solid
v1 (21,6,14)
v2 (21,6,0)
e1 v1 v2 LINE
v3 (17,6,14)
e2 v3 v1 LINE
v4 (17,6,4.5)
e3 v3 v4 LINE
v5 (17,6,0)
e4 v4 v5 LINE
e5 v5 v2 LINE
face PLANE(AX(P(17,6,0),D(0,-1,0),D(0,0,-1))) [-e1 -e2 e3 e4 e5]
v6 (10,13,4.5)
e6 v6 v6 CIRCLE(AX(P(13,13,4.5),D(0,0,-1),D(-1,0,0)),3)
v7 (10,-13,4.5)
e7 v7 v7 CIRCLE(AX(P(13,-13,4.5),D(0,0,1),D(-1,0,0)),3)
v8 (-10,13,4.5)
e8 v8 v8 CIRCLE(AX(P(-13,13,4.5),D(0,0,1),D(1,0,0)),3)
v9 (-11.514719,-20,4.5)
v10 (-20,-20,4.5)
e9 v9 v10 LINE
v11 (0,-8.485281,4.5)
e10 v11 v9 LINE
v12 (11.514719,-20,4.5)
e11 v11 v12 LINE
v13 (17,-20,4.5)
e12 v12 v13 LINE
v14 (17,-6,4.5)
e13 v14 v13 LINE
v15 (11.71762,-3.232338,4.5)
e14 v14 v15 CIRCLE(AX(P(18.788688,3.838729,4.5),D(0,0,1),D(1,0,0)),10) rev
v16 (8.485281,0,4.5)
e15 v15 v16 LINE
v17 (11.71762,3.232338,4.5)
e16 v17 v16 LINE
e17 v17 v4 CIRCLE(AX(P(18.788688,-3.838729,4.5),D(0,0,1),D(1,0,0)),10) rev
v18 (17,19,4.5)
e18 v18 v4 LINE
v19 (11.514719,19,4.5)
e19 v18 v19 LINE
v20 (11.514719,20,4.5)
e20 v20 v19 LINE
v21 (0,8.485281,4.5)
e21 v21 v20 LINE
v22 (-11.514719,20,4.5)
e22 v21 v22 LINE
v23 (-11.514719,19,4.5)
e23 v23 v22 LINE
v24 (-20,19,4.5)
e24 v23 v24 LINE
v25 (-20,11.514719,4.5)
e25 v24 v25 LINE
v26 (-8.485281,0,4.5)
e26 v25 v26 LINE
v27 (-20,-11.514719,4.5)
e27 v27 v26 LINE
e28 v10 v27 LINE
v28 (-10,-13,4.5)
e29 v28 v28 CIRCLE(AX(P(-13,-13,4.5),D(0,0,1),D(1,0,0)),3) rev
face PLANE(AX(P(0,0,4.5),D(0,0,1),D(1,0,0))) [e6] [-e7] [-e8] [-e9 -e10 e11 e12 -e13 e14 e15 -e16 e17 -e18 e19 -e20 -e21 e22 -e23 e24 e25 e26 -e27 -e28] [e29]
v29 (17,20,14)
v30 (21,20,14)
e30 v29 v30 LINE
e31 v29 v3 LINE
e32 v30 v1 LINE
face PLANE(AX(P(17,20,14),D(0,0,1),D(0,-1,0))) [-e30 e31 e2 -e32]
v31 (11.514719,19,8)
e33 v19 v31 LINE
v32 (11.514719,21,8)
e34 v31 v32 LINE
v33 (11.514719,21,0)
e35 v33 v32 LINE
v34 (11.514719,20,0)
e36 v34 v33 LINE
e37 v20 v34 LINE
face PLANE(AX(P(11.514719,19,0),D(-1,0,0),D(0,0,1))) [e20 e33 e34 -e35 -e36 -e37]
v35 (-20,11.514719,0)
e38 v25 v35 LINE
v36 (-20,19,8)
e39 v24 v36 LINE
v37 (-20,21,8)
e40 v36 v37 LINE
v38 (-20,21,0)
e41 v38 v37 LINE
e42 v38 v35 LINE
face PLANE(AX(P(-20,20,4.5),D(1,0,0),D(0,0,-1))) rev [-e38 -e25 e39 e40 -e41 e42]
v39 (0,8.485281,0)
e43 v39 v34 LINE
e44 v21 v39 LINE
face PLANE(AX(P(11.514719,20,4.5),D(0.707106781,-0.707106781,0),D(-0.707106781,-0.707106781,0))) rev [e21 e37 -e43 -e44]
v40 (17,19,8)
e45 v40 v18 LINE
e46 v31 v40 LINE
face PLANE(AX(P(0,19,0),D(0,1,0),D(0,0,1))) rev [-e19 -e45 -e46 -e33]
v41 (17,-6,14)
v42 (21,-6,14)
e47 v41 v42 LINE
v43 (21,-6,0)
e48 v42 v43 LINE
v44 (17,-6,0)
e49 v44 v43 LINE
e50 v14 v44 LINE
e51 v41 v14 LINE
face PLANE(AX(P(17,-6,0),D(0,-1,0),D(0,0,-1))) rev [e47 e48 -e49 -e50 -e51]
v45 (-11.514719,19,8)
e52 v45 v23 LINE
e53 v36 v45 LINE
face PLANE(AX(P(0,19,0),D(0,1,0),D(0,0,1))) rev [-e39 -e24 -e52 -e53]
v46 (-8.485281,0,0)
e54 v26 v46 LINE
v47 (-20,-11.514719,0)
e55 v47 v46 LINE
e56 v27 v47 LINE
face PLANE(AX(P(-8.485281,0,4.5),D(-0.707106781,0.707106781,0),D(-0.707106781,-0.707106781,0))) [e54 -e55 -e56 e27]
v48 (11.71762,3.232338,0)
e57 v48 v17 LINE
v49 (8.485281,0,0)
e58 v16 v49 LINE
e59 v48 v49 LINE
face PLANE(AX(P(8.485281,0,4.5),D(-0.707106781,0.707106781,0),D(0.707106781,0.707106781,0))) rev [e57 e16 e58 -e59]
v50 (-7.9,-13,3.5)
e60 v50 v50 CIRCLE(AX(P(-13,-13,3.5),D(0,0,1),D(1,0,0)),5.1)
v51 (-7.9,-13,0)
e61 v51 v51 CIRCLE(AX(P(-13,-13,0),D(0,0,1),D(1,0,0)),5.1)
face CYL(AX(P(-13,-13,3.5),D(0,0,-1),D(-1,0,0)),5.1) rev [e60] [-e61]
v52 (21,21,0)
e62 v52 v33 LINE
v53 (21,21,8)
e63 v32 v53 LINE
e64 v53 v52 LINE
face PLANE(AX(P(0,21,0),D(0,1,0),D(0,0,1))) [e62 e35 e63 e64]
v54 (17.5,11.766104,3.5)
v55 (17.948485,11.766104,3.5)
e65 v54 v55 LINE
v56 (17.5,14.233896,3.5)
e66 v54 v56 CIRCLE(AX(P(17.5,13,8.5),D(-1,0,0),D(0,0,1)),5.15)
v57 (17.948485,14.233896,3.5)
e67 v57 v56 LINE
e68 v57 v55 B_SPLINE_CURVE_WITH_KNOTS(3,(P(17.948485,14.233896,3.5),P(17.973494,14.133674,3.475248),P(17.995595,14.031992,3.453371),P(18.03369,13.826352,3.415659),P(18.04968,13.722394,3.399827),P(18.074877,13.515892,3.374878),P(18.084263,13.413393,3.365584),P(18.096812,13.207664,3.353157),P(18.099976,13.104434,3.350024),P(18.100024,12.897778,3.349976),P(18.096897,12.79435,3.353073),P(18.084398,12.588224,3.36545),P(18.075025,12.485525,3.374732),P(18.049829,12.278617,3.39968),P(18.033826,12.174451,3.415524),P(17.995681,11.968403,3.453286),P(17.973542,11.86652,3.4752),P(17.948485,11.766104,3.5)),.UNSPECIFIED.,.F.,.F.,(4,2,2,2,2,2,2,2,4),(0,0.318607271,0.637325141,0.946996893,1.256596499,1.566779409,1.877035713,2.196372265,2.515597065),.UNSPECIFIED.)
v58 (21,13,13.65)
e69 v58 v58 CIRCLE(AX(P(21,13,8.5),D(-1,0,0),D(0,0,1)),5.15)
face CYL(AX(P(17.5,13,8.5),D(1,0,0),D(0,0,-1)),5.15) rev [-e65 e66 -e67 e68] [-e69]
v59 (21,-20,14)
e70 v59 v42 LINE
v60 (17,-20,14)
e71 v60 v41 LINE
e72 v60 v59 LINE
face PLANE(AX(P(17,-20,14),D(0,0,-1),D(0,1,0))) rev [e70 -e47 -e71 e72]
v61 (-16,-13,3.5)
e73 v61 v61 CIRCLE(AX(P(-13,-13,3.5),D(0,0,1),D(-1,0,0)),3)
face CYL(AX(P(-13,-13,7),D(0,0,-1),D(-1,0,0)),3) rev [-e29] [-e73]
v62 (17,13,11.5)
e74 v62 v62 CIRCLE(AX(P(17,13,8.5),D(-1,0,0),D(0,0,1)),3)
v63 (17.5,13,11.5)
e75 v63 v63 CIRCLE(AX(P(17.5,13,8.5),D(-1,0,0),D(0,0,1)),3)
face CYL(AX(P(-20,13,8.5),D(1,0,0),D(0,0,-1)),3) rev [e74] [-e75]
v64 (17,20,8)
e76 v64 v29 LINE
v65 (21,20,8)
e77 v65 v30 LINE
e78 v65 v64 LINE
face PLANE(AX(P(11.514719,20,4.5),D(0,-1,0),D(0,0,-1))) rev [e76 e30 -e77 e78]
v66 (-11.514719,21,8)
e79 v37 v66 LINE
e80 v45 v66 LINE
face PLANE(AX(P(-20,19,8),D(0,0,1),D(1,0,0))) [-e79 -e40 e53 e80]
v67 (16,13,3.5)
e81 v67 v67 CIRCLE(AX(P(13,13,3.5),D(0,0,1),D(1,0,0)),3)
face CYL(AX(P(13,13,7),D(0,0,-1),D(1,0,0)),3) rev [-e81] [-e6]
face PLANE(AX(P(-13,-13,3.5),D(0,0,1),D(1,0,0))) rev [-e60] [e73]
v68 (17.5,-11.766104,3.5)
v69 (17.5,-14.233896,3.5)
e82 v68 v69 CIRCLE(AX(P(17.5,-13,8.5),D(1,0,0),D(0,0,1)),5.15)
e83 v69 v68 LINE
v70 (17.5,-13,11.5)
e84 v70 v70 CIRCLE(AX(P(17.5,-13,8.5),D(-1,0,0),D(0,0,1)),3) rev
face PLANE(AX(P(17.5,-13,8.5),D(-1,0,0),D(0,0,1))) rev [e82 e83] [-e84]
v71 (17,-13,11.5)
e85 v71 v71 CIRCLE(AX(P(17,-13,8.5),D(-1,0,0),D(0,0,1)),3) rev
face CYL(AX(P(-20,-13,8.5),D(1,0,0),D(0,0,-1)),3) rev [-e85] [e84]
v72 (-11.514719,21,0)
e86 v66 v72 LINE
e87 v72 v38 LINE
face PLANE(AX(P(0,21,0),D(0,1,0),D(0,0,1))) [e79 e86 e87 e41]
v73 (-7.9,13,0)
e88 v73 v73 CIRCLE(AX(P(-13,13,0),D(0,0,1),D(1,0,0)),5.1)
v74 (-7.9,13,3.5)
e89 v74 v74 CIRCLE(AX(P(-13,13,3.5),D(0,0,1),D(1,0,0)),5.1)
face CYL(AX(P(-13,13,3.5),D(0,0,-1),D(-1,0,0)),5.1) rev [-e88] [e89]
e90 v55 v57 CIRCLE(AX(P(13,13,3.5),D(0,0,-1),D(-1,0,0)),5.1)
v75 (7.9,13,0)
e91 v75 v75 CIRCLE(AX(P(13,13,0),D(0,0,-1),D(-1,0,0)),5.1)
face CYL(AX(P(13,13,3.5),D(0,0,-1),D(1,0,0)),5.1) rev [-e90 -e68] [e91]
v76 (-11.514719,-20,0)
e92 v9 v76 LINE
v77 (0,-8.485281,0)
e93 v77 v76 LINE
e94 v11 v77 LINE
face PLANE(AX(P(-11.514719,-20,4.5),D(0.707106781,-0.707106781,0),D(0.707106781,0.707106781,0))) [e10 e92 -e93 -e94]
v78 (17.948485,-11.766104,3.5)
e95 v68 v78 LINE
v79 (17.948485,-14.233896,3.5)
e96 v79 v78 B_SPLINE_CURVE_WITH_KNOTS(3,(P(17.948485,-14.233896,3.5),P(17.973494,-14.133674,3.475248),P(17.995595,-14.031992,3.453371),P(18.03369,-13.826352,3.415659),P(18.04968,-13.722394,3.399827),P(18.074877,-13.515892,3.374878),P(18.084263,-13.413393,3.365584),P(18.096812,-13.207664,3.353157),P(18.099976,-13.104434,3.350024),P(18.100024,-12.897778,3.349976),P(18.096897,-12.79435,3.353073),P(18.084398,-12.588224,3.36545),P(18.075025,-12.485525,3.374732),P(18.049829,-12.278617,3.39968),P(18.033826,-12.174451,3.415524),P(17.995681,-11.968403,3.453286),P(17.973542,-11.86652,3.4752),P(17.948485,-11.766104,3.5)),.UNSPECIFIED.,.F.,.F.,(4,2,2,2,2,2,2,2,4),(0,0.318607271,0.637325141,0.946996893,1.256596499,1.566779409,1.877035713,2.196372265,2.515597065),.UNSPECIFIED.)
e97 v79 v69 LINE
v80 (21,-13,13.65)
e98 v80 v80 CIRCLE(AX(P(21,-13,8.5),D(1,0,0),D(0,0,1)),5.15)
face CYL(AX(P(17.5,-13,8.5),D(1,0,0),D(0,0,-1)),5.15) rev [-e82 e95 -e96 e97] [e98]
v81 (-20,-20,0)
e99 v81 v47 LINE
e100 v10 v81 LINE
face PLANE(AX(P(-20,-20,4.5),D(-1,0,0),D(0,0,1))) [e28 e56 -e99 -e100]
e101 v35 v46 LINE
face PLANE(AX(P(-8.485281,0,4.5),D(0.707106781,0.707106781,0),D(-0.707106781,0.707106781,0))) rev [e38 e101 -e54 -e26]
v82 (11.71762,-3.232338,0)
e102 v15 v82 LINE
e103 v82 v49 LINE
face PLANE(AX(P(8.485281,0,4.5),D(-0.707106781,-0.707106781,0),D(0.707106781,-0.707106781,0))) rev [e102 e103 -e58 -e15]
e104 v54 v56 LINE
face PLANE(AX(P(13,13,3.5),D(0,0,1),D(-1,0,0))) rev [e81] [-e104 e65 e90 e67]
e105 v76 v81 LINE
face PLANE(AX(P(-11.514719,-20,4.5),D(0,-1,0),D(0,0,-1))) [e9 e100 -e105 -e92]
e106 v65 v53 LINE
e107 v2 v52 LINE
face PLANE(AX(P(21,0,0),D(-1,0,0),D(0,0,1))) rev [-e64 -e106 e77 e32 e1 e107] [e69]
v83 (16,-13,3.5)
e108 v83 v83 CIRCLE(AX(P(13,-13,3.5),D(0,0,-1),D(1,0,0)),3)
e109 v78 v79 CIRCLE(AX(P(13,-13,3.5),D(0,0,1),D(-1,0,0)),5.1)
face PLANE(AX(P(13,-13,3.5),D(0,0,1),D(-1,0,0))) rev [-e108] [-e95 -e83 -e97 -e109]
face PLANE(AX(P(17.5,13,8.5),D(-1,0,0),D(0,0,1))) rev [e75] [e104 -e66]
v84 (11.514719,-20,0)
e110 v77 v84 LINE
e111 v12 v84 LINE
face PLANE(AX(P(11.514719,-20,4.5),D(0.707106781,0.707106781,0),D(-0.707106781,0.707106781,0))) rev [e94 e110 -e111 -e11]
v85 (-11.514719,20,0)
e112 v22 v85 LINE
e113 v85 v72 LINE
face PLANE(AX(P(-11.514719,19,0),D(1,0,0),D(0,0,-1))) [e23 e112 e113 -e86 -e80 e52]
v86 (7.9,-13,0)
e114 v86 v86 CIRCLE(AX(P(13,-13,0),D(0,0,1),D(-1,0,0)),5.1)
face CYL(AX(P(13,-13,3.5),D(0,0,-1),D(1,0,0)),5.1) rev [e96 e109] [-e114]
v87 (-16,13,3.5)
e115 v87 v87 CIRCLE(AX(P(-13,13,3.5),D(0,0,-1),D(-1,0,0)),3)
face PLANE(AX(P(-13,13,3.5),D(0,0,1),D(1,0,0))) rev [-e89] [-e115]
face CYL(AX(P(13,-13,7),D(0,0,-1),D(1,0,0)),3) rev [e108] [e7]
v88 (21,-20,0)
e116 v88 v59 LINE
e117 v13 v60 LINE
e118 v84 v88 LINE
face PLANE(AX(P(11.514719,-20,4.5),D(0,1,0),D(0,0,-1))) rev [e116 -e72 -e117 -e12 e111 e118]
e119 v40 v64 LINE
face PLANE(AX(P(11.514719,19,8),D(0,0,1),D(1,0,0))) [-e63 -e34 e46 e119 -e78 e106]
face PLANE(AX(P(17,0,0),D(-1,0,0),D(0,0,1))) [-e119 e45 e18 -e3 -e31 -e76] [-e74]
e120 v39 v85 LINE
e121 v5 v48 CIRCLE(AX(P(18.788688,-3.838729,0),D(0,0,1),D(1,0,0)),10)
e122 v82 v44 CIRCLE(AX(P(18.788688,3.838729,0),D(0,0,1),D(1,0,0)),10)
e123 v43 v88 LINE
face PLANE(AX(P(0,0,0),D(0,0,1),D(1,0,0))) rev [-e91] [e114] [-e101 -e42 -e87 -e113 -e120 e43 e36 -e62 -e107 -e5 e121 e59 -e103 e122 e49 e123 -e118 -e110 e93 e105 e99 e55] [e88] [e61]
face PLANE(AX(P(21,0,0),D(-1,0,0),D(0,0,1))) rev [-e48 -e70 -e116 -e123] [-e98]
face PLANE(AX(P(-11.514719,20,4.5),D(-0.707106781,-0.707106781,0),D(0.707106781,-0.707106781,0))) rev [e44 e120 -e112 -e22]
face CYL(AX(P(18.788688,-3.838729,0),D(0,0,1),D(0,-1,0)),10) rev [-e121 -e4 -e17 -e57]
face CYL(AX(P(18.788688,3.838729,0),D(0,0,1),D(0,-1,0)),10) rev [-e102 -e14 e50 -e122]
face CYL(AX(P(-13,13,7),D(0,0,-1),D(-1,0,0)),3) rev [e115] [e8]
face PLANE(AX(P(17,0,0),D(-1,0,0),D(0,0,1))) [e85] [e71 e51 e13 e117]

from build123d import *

# Parameters (mm, degrees)
RESSALTO_EXTRUS_O1_DEPTH      = 4.5
CORTE_EXTRUS_O1_START         = -4.5
ESBO_O2_R                     = 5.1
CORTE_EXTRUS_O1_DEPTH         = 3.5
ESBO_O3_R                     = 3
CORTE_EXTRUS_O2_DEPTH         = 3.5
ESPELHAR2_COPY_1_DEPTH        = 4.5
ESPELHAR2_START               = -4.5
ESPELHAR2_COPY_2_SKETCH_R     = 5.1
ESPELHAR2_COPY_2_DEPTH        = 3.5
ESPELHAR2_COPY_3_SKETCH_R     = 3
ESPELHAR2_COPY_3_DEPTH        = 3.5
RESSALTO_EXTRUS_O2_START      = -3
ESBO_O5_W                     = 14
ESBO_O5_H                     = 14
RESSALTO_EXTRUS_O2_DEPTH      = 4
ESBO_O6_R                     = 5.15
CORTE_EXTRUS_O3_DEPTH         = 3.5
ESBO_O7_R                     = 3
CORTE_EXTRUS_O4_DEPTH         = 45.746508244
FILETE1_R                     = 10
RESSALTO_EXTRUS_O3_DEPTH      = 1
RESSALTO_EXTRUS_O3_DEPTH_BACK = 1
ESBO_O8_W                     = 8.485281374
ESBO_O8_H                     = 8
ESBO_O8_W_2                   = 9.485281374
ESPELHAR5_START               = -4.5
ESPELHAR5_COPY_1_SKETCH_R     = 5.1
ESPELHAR5_COPY_1_DEPTH        = 3.5
ESPELHAR5_COPY_2_SKETCH_R     = 5.1
ESPELHAR5_COPY_2_DEPTH        = 3.5


with BuildPart() as part:
    # Esboço1 → Ressalto-extrusão1 (new body)
    with BuildSketch(Plane.XY):
        Polygon((-8.485281374, 0), (-20, 11.514718626), (-20, 20), (-11.514718626, 20), (0, 8.485281374), (0, 0), align=None)
    ressalto_extrus_o1 = extrude(amount=RESSALTO_EXTRUS_O1_DEPTH)

    # Esboço2 → Corte-extrusão1 (cut)
    with BuildSketch(Plane.XY.offset(4.5).offset(CORTE_EXTRUS_O1_START)):
        with Locations((-13, 13)):
            Circle(ESBO_O2_R)
    corte_extrus_o1 = extrude(amount=CORTE_EXTRUS_O1_DEPTH, mode=Mode.SUBTRACT)

    # Esboço3 → Corte-extrusão2 (cut)
    with BuildSketch(Plane(origin=(0, 0, 3.5), x_dir=(-1, 0, 0), z_dir=(0, 0, -1))):
        with Locations((13, 13)):
            Circle(ESBO_O3_R)
    corte_extrus_o2 = extrude(amount=-CORTE_EXTRUS_O2_DEPTH, mode=Mode.SUBTRACT)

    # Espelhar1: Ressalto-extrusão1, Corte-extrusão1, Corte-extrusão2 across plane
    add(ressalto_extrus_o1.mirror(Plane(origin=(0, 0, 0), x_dir=(0, 0, 1), z_dir=(1, 0, 0))))
    add(corte_extrus_o1.mirror(Plane(origin=(0, 0, 0), x_dir=(0, 0, 1), z_dir=(1, 0, 0))), mode=Mode.SUBTRACT)
    add(corte_extrus_o2.mirror(Plane(origin=(0, 0, 0), x_dir=(0, 0, 1), z_dir=(1, 0, 0))), mode=Mode.SUBTRACT)

    # Espelhar2: Ressalto-extrusão1, Corte-extrusão1, Corte-extrusão2 across plane
    add(ressalto_extrus_o1.mirror(Plane.ZX))
    add(corte_extrus_o1.mirror(Plane.ZX), mode=Mode.SUBTRACT)
    add(corte_extrus_o2.mirror(Plane.ZX), mode=Mode.SUBTRACT)

    # Espelhar2 copy 1 sketch → Espelhar2 copy 1 (add)
    with BuildSketch(Plane(origin=(0, 0, 0), x_dir=(-1, 0, 0), z_dir=(0, 0, 1))):
        Polygon((-8.485281374, 0), (-20, 11.514718626), (-20, 20), (-11.514718626, 20), (0, 8.485281374), (0, 0), align=None)
    extrude(amount=ESPELHAR2_COPY_1_DEPTH)

    # Espelhar2 copy 2 sketch → Espelhar2 copy 2 (cut)
    with BuildSketch(Plane(origin=(0, 0, 4.5), x_dir=(-1, 0, 0), z_dir=(0, 0, 1)).offset(ESPELHAR2_START)):
        with Locations((-13, 13)):
            Circle(ESPELHAR2_COPY_2_SKETCH_R)
    extrude(amount=ESPELHAR2_COPY_2_DEPTH, mode=Mode.SUBTRACT)

    # Espelhar2 copy 3 sketch → Espelhar2 copy 3 (cut)
    with BuildSketch(Plane(origin=(0, 0, 3.5), x_dir=(1, 0, 0), z_dir=(0, 0, -1))):
        with Locations((13, 13)):
            Circle(ESPELHAR2_COPY_3_SKETCH_R)
    extrude(amount=-ESPELHAR2_COPY_3_DEPTH, mode=Mode.SUBTRACT)

    # Esboço5 → Ressalto-extrusão2 (add)
    with BuildSketch(Plane(origin=(20, 0, 0), x_dir=(0, 0, -1), z_dir=(1, 0, 0)).offset(RESSALTO_EXTRUS_O2_START)):
        with Locations((-7, 13)):
            Rectangle(ESBO_O5_W, ESBO_O5_H)
    ressalto_extrus_o2 = extrude(amount=RESSALTO_EXTRUS_O2_DEPTH)

    # Esboço6 → Corte-extrusão3 (cut)
    with BuildSketch(Plane.ZY.offset(-21)):
        with Locations((8.5, 13)):
            Circle(ESBO_O6_R)
    corte_extrus_o3 = extrude(amount=CORTE_EXTRUS_O3_DEPTH, mode=Mode.SUBTRACT)

    # Esboço7 → Corte-extrusão4 (cut, symmetric)
    with BuildSketch(Plane(origin=(17.5, 0, 0), x_dir=(0, 0, -1), z_dir=(1, 0, 0))):
        with Locations(Location((-8.5, 13, 0), (0, 0, 180))):
            Circle(ESBO_O7_R)
    corte_extrus_o4 = extrude(amount=CORTE_EXTRUS_O4_DEPTH, both=True, mode=Mode.SUBTRACT)

    # Espelhar3: Ressalto-extrusão2, Corte-extrusão3, Corte-extrusão4 across plane
    add(ressalto_extrus_o2.mirror(Plane.ZX))
    add(corte_extrus_o3.mirror(Plane.ZX), mode=Mode.SUBTRACT)
    add(corte_extrus_o4.mirror(Plane.ZX), mode=Mode.SUBTRACT)

    # Filete1
    # the kernel refuses this fillet: 10 mm, written as the material it adds along each edge
    with BuildSketch(Plane(origin=(17, 8.514718626, 4.5), x_dir=(0, -1, 0), z_dir=(0, 0, -1))) as filete1_piece_1:
        with BuildLine():
            CenterArc((12.353448055, -1.788687569), FILETE1_R, 135, 34.696124969)
            Line((5.282380243, 5.282380243), (0, 0))
            Line((0, 0), (2.514718626, 0))
        make_face()
    extrude(amount=4.5)
    with BuildSketch(Plane(origin=(17, -8.514718626, 0), x_dir=(-0.7071067811865464, 0.7071067811865487, 0), z_dir=(0, 0, 1))) as filete1_piece_2:
        with BuildLine():
            CenterArc((7.470413781, -10), FILETE1_R, 90, 34.696124969)
            Line((1.778174593, -1.778174593), (0, 0))
            Line((0, 0), (7.470413781, 0))
        make_face()
    extrude(amount=4.5)

    # Esboço8 → Ressalto-extrusão3 (add, two sides: drawn at the far end of the back side and taken through both)
    with BuildSketch(Plane(origin=(0, 20, 0), x_dir=(1, 0, 0), z_dir=(0, 1, 0)).offset(-RESSALTO_EXTRUS_O3_DEPTH_BACK)):
        with Locations((-15.757359313, -4)):
            Rectangle(ESBO_O8_W, ESBO_O8_H)
        with Locations((16.257359313, -4)):
            Rectangle(ESBO_O8_W_2, ESBO_O8_H)
    extrude(amount=RESSALTO_EXTRUS_O3_DEPTH + RESSALTO_EXTRUS_O3_DEPTH_BACK)

    # Espelhar4: Corte-extrusão1 across plane
    add(corte_extrus_o1.mirror(Plane(origin=(0, 0, 0), x_dir=(0, 0, 1), z_dir=(1, 0, 0))), mode=Mode.SUBTRACT)

    # Espelhar5 copy 1 sketch → Espelhar5 copy 1 (cut)
    with BuildSketch(Plane(origin=(0, 0, 4.5), x_dir=(-1, 0, 0), z_dir=(0, 0, 1)).offset(ESPELHAR5_START)):
        with Locations((-13, 13)):
            Circle(ESPELHAR5_COPY_1_SKETCH_R)
    extrude(amount=ESPELHAR5_COPY_1_DEPTH, mode=Mode.SUBTRACT)

    # Espelhar5 copy 2 sketch → Espelhar5 copy 2 (cut)
    with BuildSketch(Plane.XY.offset(4.5).offset(ESPELHAR5_START)):
        with Locations((-13, -13)):
            Circle(ESPELHAR5_COPY_2_SKETCH_R)
    extrude(amount=ESPELHAR5_COPY_2_DEPTH, mode=Mode.SUBTRACT)


solid = part.part
